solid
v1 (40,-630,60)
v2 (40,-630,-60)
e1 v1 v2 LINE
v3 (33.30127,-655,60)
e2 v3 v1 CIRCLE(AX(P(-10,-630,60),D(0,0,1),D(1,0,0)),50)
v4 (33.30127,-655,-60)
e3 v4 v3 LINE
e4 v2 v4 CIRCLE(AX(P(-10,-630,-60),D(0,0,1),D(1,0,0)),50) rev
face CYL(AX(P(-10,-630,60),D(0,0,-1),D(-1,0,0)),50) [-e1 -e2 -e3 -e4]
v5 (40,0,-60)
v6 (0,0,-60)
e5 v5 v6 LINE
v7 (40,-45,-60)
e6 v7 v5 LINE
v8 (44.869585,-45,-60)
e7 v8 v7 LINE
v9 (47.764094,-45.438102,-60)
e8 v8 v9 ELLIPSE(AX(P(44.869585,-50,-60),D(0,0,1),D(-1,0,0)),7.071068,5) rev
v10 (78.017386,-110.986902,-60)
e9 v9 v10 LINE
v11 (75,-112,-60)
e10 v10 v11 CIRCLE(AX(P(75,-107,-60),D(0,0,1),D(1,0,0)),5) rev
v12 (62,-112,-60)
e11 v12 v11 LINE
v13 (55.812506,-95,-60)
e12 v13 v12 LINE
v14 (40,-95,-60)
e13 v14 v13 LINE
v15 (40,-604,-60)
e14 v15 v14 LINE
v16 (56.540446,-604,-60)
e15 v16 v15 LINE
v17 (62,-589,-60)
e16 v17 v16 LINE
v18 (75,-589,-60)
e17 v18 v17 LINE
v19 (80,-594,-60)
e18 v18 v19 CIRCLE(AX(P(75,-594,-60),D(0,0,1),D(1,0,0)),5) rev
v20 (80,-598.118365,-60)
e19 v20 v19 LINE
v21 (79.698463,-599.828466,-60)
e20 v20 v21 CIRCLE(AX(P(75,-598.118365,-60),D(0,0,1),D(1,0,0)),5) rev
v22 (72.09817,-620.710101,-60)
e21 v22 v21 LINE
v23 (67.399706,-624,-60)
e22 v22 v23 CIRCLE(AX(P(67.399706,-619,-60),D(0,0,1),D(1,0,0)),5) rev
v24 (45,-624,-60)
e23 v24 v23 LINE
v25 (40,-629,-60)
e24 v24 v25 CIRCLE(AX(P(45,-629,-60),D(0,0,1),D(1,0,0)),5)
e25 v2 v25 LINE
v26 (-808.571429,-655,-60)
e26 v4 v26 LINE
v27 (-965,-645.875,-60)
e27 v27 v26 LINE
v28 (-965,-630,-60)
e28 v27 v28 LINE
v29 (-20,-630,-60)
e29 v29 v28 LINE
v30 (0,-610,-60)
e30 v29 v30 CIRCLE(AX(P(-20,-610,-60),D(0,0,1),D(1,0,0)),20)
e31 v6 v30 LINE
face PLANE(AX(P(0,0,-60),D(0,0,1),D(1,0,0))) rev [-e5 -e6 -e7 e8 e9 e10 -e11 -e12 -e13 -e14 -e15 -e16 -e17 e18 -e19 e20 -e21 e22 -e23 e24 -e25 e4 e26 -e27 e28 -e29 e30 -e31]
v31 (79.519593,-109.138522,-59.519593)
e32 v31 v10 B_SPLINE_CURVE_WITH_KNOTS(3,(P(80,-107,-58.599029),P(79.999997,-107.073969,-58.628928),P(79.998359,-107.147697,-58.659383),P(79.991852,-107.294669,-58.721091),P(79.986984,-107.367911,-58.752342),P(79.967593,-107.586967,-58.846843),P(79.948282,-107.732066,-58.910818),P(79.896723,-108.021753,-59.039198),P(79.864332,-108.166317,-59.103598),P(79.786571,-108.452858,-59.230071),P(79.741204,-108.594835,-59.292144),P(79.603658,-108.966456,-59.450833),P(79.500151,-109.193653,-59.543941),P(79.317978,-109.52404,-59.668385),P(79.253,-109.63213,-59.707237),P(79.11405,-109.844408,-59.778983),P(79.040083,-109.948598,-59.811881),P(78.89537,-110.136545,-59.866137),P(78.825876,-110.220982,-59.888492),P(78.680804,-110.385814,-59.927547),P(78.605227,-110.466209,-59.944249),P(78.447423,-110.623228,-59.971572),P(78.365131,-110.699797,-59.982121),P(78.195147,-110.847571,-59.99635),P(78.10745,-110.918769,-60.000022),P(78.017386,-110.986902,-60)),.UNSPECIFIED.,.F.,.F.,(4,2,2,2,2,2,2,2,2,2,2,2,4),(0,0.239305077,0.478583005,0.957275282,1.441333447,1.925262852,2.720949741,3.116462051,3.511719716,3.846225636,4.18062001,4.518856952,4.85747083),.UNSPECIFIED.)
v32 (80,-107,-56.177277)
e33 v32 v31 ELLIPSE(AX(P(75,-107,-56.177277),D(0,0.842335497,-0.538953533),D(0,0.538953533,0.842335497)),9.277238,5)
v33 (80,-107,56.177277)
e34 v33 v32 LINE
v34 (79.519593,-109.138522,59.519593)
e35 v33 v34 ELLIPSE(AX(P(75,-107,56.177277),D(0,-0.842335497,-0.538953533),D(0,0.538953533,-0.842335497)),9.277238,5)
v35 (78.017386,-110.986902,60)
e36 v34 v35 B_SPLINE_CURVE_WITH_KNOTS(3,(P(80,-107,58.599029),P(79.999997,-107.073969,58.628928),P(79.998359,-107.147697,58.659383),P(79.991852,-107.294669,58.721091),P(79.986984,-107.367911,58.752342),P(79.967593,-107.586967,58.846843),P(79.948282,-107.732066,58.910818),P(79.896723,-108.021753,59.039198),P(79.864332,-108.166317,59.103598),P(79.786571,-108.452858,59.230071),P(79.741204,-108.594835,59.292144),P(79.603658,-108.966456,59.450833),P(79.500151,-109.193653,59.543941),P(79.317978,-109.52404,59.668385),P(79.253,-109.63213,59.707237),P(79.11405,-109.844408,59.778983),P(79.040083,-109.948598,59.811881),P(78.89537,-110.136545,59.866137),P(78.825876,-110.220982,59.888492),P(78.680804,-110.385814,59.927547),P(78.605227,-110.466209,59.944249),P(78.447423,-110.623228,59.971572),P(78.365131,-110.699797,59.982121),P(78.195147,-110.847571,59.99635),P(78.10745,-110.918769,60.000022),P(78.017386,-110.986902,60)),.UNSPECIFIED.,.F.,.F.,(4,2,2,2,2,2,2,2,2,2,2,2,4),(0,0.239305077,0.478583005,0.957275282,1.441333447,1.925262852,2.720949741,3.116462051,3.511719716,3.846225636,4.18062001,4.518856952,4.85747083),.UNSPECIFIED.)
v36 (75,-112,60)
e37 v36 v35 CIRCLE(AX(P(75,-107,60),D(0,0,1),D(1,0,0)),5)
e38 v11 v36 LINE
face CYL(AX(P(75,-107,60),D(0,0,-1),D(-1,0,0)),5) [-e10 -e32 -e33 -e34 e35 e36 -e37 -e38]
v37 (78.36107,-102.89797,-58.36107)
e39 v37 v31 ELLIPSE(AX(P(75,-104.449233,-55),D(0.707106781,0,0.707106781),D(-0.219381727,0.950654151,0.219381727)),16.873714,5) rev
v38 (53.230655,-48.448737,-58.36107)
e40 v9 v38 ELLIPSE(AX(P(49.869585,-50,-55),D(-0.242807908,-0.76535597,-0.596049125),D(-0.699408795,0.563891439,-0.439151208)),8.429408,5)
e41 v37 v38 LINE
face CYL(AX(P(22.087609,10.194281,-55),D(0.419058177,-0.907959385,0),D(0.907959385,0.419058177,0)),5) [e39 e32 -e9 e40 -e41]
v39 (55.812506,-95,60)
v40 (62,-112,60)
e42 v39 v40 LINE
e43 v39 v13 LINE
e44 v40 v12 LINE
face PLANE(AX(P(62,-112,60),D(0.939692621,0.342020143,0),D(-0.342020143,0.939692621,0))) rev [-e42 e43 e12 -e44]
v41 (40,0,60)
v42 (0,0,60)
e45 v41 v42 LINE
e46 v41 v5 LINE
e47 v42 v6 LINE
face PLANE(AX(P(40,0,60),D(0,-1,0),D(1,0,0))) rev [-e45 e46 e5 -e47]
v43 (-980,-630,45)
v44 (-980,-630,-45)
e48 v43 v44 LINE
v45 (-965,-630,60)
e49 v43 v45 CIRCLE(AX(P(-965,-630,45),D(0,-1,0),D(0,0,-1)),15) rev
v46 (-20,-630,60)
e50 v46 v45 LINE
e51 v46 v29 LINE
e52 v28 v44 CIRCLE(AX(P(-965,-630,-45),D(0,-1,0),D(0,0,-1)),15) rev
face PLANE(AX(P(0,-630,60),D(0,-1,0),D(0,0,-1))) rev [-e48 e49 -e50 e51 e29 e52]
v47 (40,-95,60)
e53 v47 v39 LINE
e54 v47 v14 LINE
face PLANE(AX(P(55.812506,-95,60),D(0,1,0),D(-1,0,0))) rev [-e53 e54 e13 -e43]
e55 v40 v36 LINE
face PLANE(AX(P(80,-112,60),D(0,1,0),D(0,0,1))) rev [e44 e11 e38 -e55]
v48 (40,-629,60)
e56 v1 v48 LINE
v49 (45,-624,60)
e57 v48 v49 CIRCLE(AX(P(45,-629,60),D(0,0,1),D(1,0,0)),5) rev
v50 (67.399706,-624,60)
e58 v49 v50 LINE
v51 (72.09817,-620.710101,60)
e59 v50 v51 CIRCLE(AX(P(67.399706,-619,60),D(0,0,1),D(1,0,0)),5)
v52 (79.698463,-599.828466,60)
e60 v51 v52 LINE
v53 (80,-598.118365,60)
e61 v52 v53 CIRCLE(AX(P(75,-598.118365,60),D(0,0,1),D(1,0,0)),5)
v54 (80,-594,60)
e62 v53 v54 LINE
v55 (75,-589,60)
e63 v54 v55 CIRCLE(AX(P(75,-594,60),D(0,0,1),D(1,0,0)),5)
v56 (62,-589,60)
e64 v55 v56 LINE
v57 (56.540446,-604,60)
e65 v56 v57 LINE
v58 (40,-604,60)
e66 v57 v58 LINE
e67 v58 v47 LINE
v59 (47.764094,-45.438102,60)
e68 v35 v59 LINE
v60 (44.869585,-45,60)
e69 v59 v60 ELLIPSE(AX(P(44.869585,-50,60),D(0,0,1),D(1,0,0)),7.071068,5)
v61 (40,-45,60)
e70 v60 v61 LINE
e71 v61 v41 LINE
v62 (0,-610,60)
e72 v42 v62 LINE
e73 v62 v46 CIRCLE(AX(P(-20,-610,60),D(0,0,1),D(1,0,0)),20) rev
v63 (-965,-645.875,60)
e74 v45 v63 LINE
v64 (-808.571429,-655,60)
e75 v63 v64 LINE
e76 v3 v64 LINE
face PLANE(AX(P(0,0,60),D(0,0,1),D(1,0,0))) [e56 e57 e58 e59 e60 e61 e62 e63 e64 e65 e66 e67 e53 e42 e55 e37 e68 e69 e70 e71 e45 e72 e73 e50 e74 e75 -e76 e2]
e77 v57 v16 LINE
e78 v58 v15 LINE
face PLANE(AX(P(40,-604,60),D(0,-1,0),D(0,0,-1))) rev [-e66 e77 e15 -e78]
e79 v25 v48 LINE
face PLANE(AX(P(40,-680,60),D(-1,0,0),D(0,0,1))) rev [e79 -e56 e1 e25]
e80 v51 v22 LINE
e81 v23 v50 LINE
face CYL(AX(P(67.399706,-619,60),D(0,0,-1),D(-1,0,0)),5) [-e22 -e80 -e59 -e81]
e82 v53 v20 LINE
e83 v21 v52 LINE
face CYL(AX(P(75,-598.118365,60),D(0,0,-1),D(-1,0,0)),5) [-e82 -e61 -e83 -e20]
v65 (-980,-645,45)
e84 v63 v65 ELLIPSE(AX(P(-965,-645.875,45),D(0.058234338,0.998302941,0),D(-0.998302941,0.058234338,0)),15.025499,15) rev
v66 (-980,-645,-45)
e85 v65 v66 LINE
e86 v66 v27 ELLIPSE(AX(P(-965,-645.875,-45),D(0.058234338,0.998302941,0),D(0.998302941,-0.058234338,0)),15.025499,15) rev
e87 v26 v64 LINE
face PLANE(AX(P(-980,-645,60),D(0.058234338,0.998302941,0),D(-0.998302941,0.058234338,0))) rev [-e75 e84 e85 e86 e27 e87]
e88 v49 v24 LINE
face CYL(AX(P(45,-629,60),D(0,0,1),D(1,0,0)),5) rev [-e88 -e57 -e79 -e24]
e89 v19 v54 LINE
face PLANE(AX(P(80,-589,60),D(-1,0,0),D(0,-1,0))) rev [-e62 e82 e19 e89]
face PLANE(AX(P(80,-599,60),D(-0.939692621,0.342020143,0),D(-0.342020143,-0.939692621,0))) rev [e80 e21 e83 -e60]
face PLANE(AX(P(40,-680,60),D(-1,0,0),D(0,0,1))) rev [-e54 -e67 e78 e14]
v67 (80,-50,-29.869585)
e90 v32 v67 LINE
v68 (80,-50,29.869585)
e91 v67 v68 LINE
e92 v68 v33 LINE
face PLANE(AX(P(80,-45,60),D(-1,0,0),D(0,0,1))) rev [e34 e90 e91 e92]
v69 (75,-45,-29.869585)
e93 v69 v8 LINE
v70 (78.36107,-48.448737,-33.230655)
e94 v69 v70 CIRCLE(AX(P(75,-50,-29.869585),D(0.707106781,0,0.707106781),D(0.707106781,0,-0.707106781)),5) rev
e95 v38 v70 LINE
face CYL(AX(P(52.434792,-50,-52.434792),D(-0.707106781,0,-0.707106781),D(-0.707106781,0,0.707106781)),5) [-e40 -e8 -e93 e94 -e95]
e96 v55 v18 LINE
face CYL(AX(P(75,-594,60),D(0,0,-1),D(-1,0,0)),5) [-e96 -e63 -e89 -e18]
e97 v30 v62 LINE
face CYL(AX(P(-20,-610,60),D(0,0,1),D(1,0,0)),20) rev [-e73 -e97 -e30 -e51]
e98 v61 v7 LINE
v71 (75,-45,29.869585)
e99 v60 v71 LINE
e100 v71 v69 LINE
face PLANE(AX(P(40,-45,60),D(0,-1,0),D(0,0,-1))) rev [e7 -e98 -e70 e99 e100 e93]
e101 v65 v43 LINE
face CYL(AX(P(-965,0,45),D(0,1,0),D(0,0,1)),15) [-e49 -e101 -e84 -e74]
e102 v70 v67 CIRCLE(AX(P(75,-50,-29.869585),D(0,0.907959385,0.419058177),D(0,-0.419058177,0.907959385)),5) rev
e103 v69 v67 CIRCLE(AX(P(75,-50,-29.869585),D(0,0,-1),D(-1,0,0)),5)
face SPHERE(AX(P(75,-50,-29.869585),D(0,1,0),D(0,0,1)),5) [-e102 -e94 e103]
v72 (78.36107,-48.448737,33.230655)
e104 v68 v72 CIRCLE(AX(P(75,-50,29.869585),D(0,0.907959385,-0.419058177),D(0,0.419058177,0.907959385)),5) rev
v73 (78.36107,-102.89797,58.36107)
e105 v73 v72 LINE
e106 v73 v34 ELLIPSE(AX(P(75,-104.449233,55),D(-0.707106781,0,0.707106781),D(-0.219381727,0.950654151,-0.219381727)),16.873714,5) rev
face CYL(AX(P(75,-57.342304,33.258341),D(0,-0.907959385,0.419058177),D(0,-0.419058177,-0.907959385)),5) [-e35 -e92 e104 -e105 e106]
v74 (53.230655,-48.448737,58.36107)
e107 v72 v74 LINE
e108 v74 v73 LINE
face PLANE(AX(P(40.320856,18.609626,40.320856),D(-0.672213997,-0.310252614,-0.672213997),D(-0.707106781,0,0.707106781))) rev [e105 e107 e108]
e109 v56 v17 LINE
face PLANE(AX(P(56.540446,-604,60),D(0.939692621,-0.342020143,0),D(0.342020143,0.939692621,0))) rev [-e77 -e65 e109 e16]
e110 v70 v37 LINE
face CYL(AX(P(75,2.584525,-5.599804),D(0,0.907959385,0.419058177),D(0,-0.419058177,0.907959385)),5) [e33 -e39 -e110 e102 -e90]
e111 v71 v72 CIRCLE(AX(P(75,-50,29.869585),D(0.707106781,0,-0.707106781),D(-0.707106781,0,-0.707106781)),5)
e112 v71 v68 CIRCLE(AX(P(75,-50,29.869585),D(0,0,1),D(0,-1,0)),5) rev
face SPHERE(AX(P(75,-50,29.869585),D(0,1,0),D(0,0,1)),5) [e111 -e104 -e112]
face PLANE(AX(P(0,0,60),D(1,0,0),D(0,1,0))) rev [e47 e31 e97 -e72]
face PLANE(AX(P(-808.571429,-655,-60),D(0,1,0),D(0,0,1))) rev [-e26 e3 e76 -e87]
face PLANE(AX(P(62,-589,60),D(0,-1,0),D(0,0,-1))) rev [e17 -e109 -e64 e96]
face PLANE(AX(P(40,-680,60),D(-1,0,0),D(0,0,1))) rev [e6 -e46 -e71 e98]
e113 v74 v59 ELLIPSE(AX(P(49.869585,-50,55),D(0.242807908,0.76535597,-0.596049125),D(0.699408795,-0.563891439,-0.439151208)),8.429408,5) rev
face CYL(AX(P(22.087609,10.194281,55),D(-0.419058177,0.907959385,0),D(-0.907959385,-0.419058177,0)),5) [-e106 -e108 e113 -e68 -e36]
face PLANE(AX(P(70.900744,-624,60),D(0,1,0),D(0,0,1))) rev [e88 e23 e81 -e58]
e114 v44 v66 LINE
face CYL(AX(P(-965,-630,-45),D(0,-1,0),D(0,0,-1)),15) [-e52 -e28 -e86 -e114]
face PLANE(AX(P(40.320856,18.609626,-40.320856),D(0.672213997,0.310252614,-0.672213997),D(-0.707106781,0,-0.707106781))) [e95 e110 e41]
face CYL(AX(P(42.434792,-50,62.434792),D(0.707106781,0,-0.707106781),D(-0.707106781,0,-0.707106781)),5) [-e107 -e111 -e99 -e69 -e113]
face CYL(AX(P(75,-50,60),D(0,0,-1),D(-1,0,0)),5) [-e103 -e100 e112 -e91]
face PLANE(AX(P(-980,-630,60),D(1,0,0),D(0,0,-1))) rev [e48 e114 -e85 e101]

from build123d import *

# Parameters (mm, degrees)
BOSS_EXTRUDE1_DEPTH = 60
FILLET1_R           = 20
FILLET2_R           = 50
SKETCH2_W           = 848.571428571
SKETCH2_H           = 25
CUT_EXTRUDE1_DEPTH  = 1199.832765652
FILLET3_R           = 15
BOSS_EXTRUDE2_DEPTH = 60
CHAMFER1_START      = 59.982172039
CHAMFER1_OUTLINE_W  = 43
CHAMFER1_OUTLINE_H  = 75
CHAMFER1_DEPTH      = 21.017827961
CHAMFER2_START      = 59.982172039
CHAMFER2_OUTLINE_W  = 43
CHAMFER2_OUTLINE_H  = 75
CHAMFER2_DEPTH      = 21.017827961
FILLET4_R           = 5


with BuildPart() as part:
    # Sketch1 → Boss-Extrude1 (new, symmetric)
    with BuildSketch(Plane.XY):
        Polygon((0, 0), (0, -630), (-980, -630), (-980, -645), (-380, -680), (40, -680), (40, 0), align=None)
    extrude(amount=BOSS_EXTRUDE1_DEPTH, both=True)

    # Fillet1
    fillet1_edges = [part.edges().sort_by_distance(p)[0] for p in [
        (0, -630, 0),
    ]]
    fillet(fillet1_edges, radius=FILLET1_R)

    # Fillet2
    fillet2_edges = [part.edges().sort_by_distance(p)[0] for p in [
        (40, -680, 0),
    ]]
    fillet(fillet2_edges, radius=FILLET2_R)

    # Sketch2 → Cut-Extrude1 (cut, through all)
    with BuildSketch(Plane.XY.offset(60)):
        with Locations((-384.285714286, -667.5)):
            Rectangle(SKETCH2_W, SKETCH2_H)
    extrude(amount=-CUT_EXTRUDE1_DEPTH, mode=Mode.SUBTRACT)

    # Fillet3
    fillet3_edges = [part.edges().sort_by_distance(p)[0] for p in [
        (-980, -637.5, 60),
        (-980, -637.5, -60),
    ]]
    fillet(fillet3_edges, radius=FILLET3_R)

    # Sketch4 → Boss-Extrude2 (add, symmetric)
    with BuildSketch(Plane.XY):
        Polygon((40, -45), (80, -45), (80, -112), (62, -112), (55.812506017, -95), (40, -95), align=None)
        Polygon((40, -604), (56.540446486, -604), (62, -589), (80, -589), (80, -599), (70.900744143, -624), (40, -624), align=None)
    extrude(amount=BOSS_EXTRUDE2_DEPTH, both=True)

    # Chamfer1: read off the stored shape, not the designer's step
    # Chamfer1 outline → Chamfer1 (cut)
    with BuildSketch(Plane(origin=(0, 0, 0), x_dir=(0.74035690193716, -0.281696772444383, -0.6103430069628291), z_dir=(0.6722139969935248, 0.3102526139970119, 0.6722139969935248)).offset(CHAMFER1_START)):
        with Locations((33.5, -89.5)):
            Rectangle(CHAMFER1_OUTLINE_W, CHAMFER1_OUTLINE_H)
    extrude(amount=CHAMFER1_DEPTH, mode=Mode.SUBTRACT)

    # Chamfer2: read off the stored shape, not the designer's step
    # Chamfer2 outline → Chamfer2 (cut)
    with BuildSketch(Plane(origin=(0, 0, 0), x_dir=(0.74035690193716, -0.281696772444383, 0.6103430069628291), z_dir=(0.6722139969935248, 0.3102526139970119, -0.6722139969935248)).offset(CHAMFER2_START)):
        with Locations((33.5, 89.5)):
            Rectangle(CHAMFER2_OUTLINE_W, CHAMFER2_OUTLINE_H)
    extrude(amount=CHAMFER2_DEPTH, mode=Mode.SUBTRACT)

    # Fillet4
    # the kernel refuses this fillet: 5 mm, written as the material it adds along each edge
    with BuildSketch(Plane(origin=(40, -624, -60), x_dir=(1, 0, 0), z_dir=(0, 0, 1))) as fillet4_piece_1:
        with BuildLine():
            CenterArc((FILLET4_R, -FILLET4_R), FILLET4_R, 90, 90)
            Line((0, -FILLET4_R), (0, 0))
            Line((0, 0), (FILLET4_R, 0))
        make_face()
    extrude(amount=120)
    # the kernel refuses this fillet: 5 mm, written as the material it takes off along each edge
    with BuildSketch(Plane(origin=(75, -50, 29.869584766), x_dir=(0, 0.45647233632715695, -0.8897376052342775), z_dir=(0.7504731319703868, 0.5880284369504243, 0.30168300503707374))) as fillet4_2_piece_1_section:
        Polygon((-8.486724439, -8.486724439), (8.486724439, -8.486724439), (8.486724439, 8.486724439), (-8.486724439, 8.486724439), align=None)
    fillet4_2_piece_1 = extrude(amount=8.486724439, mode=Mode.PRIVATE)
    fillet4_2_piece_1 = split(fillet4_2_piece_1, bisect_by=Plane(origin=(75, -50, 29.869584766), z_dir=(0, 0.9079593845004515, -0.41905817746174745)), keep=Keep.TOP, mode=Mode.PRIVATE)
    fillet4_2_piece_1 = split(fillet4_2_piece_1, bisect_by=Plane(origin=(75, -50, 29.869584766), z_dir=(0.7071067811865476, 0, -0.7071067811865476)), keep=Keep.TOP, mode=Mode.PRIVATE)
    fillet4_2_piece_1 = split(fillet4_2_piece_1, bisect_by=Plane(origin=(75, -50, 29.869584766), z_dir=(0, 0, 1)), keep=Keep.TOP, mode=Mode.PRIVATE)
    fillet4_2_piece_1 = split(fillet4_2_piece_1, bisect_by=Plane(origin=(80, -50, 29.869584766), z_dir=(-1, 0, 0)), keep=Keep.TOP, mode=Mode.PRIVATE)
    fillet4_2_piece_1 = split(fillet4_2_piece_1, bisect_by=Plane(origin=(78.361069985, -48.44873693, 33.230654751), z_dir=(-0.6722139969935248, -0.3102526139970119, -0.6722139969935248)), keep=Keep.TOP, mode=Mode.PRIVATE)
    fillet4_2_piece_1 = split(fillet4_2_piece_1, bisect_by=Plane(origin=(75, -45, 29.869584766), z_dir=(0, -1, 0)), keep=Keep.TOP, mode=Mode.PRIVATE)
    fillet4_2_piece_1 = fillet4_2_piece_1 - Plane(origin=(75, -50, 29.869584766), x_dir=(-0.7504731319703868, -0.5880284369504243, -0.30168300503707374), z_dir=(0, 0.45647233632715695, -0.8897376052342775)) * Sphere(FILLET4_R, mode=Mode.PRIVATE)
    add(fillet4_2_piece_1, mode=Mode.SUBTRACT)
    with BuildSketch(Plane(origin=(75, -50, -29.869584766), x_dir=(-0.6608271381079537, 0.6608271381079537, -0.3558299974427439), z_dir=(0.7504731319703868, 0.5880284369504243, -0.30168300503707374))) as fillet4_2_piece_2_section:
        Polygon((-8.486724439, -8.486724439), (8.486724439, -8.486724439), (8.486724439, 8.486724439), (-8.486724439, 8.486724439), align=None)
    fillet4_2_piece_2 = extrude(amount=8.486724439, mode=Mode.PRIVATE)
    fillet4_2_piece_2 = split(fillet4_2_piece_2, bisect_by=Plane(origin=(75, -50, -29.869584766), z_dir=(0, 0.9079593845004515, 0.41905817746174745)), keep=Keep.TOP, mode=Mode.PRIVATE)
    fillet4_2_piece_2 = split(fillet4_2_piece_2, bisect_by=Plane(origin=(75, -50, -29.869584766), z_dir=(0, 0, -1)), keep=Keep.TOP, mode=Mode.PRIVATE)
    fillet4_2_piece_2 = split(fillet4_2_piece_2, bisect_by=Plane(origin=(75, -50, -29.869584766), z_dir=(0.7071067811865476, 0, 0.7071067811865476)), keep=Keep.TOP, mode=Mode.PRIVATE)
    fillet4_2_piece_2 = split(fillet4_2_piece_2, bisect_by=Plane(origin=(78.361069985, -48.44873693, -33.230654751), z_dir=(-0.6722139969935248, -0.3102526139970119, 0.6722139969935248)), keep=Keep.TOP, mode=Mode.PRIVATE)
    fillet4_2_piece_2 = split(fillet4_2_piece_2, bisect_by=Plane(origin=(80, -50, -29.869584766), z_dir=(-1, 0, 0)), keep=Keep.TOP, mode=Mode.PRIVATE)
    fillet4_2_piece_2 = split(fillet4_2_piece_2, bisect_by=Plane(origin=(75, -45, -29.869584766), z_dir=(0, -1, 0)), keep=Keep.TOP, mode=Mode.PRIVATE)
    fillet4_2_piece_2 = fillet4_2_piece_2 - Plane(origin=(75, -50, -29.869584766), x_dir=(-0.7504731319703868, -0.5880284369504243, 0.30168300503707374), z_dir=(-0.6608271381079537, 0.6608271381079537, -0.3558299974427439)) * Sphere(FILLET4_R, mode=Mode.PRIVATE)
    add(fillet4_2_piece_2, mode=Mode.SUBTRACT)
    with BuildSketch(Plane(origin=(82.319175466, -115.024880177, 60), x_dir=(-0.9079593845004514, -0.4190581774617474, 0), z_dir=(-0.41905817746174745, 0.9079593845004515, 0))) as fillet4_2_piece_3:
        with BuildLine():
            CenterArc((FILLET4_R * 0.4427405244, -FILLET4_R), FILLET4_R, 90, 47.761827017)
            Line((-FILLET4_R * 0.297616377538, -FILLET4_R * 0.327786003006), (0, 0))
            Line((0, 0), (FILLET4_R * 0.4427405244, 0))
        make_face()
    extrude(amount=82.657618428, mode=Mode.SUBTRACT)
    with BuildSketch(Plane(origin=(80, -45, 29.869584766), x_dir=(-1, 0, 0), z_dir=(0, 0, -1))) as fillet4_2_piece_4:
        with BuildLine():
            CenterArc((FILLET4_R, -FILLET4_R), FILLET4_R, 90, 90)
            Line((0, -FILLET4_R), (0, 0))
            Line((0, 0), (FILLET4_R, 0))
        make_face()
    extrude(amount=59.739169533, mode=Mode.SUBTRACT)
    with BuildSketch(Plane(origin=(80, -115.024880177, 62.319175466), x_dir=(0, -0.41905817746174745, -0.9079593845004515), z_dir=(0, 0.9079593845004515, -0.41905817746174745))) as fillet4_2_piece_5:
        with BuildLine():
            CenterArc((FILLET4_R * 0.4427405244, FILLET4_R), FILLET4_R, 222.238172983, 47.761827017)
            Line((-FILLET4_R * 0.297616377538, FILLET4_R * 0.327786003006), (0, 0))
            Line((0, 0), (FILLET4_R * 0.4427405244, 0))
        make_face()
    extrude(amount=72.63821652, mode=Mode.SUBTRACT)
    with BuildSketch(Plane(origin=(77.565207617, -45, 32.434792383), x_dir=(-0.7071067811865476, 0, -0.7071067811865476), z_dir=(-0.7071067811865476, 0, 0.7071067811865476)), Plane(origin=(43.586980958, -45, -66.413019041), x_dir=(-0.7071067811865476, 0, 0.7071067811865476), z_dir=(0.7071067811865476, 0, 0.7071067811865476))) as fillet4_2_piece_6:
        with BuildLine():
            CenterArc((FILLET4_R * 0.725550280312, FILLET4_R), FILLET4_R, 198.074454838, 71.925545162)
            Line((-FILLET4_R * 0.225103871053, FILLET4_R * 0.689747386003), (0, 0))
            Line((0, 0), (FILLET4_R * 0.725550280312, 0))
        make_face()
    extrude(amount=48.052468966, mode=Mode.SUBTRACT)
    with BuildSketch(Plane(origin=(80, -49.072329814, -31.879536837), x_dir=(-0.7403569019371568, 0.2816967724443845, -0.6103430069628323), z_dir=(0, -0.9079593845004515, -0.41905817746174745))) as fillet4_2_piece_7:
        with BuildLine():
            CenterArc((FILLET4_R * 0.4427405244, -FILLET4_R), FILLET4_R, 90, 47.761827017)
            Line((-FILLET4_R * 0.297616377538, -FILLET4_R * 0.327786003006), (0, 0))
            Line((0, 0), (FILLET4_R * 0.4427405244, 0))
        make_face()
    extrude(amount=72.63821652, mode=Mode.SUBTRACT)
    with BuildSketch(Plane(origin=(82.319175466, -115.024880177, -60), x_dir=(-0.9079593845004514, -0.4190581774617474, 0), z_dir=(-0.41905817746174745, 0.9079593845004515, 0))) as fillet4_2_piece_8:
        with BuildLine():
            CenterArc((FILLET4_R * 0.4427405244, FILLET4_R), FILLET4_R, 222.238172983, 47.761827017)
            Line((-FILLET4_R * 0.297616377538, FILLET4_R * 0.327786003006), (0, 0))
            Line((0, 0), (FILLET4_R * 0.4427405244, 0))
        make_face()
    extrude(amount=82.657618428, mode=Mode.SUBTRACT)
    with BuildSketch(Plane(origin=(80, -112, 72.5), x_dir=(0, 1, 0), z_dir=(0, 0, -1)), Plane(origin=(80, -589, 72.5), x_dir=(-1, 0, 0), z_dir=(0, 0, -1))) as fillet4_2_piece_9:
        with BuildLine():
            CenterArc((FILLET4_R, -FILLET4_R), FILLET4_R, 90, 90)
            Line((0, -FILLET4_R), (0, 0))
            Line((0, 0), (FILLET4_R, 0))
        make_face()
    extrude(amount=145, mode=Mode.SUBTRACT)
    with BuildSketch(Plane(origin=(70.900744143, -624, -68.752594228), x_dir=(0.34202014332566244, 0.9396926207859106, 0), z_dir=(0, 0, 1))) as fillet4_2_piece_10:
        with BuildLine():
            CenterArc((FILLET4_R * 0.70020753821, FILLET4_R), FILLET4_R, 200, 70)
            Line((-FILLET4_R * 0.239485082576, FILLET4_R * 0.657979856674), (0, 0))
            Line((0, 0), (FILLET4_R * 0.70020753821, 0))
        make_face()
    extrude(amount=137.505188455, mode=Mode.SUBTRACT)
    with BuildSketch(Plane(origin=(80, -599, 62.204087259), x_dir=(0, 1, 0), z_dir=(0, 0, -1))) as fillet4_2_piece_11:
        with BuildLine():
            CenterArc((FILLET4_R * 0.176326980708, -FILLET4_R), FILLET4_R, 90, 20)
            Line((-FILLET4_R * 0.165693162617, -FILLET4_R * 0.0603073792141), (0, 0))
            Line((0, 0), (FILLET4_R * 0.176326980708, 0))
        make_face()
    extrude(amount=124.408174518, mode=Mode.SUBTRACT)


solid = part.part
